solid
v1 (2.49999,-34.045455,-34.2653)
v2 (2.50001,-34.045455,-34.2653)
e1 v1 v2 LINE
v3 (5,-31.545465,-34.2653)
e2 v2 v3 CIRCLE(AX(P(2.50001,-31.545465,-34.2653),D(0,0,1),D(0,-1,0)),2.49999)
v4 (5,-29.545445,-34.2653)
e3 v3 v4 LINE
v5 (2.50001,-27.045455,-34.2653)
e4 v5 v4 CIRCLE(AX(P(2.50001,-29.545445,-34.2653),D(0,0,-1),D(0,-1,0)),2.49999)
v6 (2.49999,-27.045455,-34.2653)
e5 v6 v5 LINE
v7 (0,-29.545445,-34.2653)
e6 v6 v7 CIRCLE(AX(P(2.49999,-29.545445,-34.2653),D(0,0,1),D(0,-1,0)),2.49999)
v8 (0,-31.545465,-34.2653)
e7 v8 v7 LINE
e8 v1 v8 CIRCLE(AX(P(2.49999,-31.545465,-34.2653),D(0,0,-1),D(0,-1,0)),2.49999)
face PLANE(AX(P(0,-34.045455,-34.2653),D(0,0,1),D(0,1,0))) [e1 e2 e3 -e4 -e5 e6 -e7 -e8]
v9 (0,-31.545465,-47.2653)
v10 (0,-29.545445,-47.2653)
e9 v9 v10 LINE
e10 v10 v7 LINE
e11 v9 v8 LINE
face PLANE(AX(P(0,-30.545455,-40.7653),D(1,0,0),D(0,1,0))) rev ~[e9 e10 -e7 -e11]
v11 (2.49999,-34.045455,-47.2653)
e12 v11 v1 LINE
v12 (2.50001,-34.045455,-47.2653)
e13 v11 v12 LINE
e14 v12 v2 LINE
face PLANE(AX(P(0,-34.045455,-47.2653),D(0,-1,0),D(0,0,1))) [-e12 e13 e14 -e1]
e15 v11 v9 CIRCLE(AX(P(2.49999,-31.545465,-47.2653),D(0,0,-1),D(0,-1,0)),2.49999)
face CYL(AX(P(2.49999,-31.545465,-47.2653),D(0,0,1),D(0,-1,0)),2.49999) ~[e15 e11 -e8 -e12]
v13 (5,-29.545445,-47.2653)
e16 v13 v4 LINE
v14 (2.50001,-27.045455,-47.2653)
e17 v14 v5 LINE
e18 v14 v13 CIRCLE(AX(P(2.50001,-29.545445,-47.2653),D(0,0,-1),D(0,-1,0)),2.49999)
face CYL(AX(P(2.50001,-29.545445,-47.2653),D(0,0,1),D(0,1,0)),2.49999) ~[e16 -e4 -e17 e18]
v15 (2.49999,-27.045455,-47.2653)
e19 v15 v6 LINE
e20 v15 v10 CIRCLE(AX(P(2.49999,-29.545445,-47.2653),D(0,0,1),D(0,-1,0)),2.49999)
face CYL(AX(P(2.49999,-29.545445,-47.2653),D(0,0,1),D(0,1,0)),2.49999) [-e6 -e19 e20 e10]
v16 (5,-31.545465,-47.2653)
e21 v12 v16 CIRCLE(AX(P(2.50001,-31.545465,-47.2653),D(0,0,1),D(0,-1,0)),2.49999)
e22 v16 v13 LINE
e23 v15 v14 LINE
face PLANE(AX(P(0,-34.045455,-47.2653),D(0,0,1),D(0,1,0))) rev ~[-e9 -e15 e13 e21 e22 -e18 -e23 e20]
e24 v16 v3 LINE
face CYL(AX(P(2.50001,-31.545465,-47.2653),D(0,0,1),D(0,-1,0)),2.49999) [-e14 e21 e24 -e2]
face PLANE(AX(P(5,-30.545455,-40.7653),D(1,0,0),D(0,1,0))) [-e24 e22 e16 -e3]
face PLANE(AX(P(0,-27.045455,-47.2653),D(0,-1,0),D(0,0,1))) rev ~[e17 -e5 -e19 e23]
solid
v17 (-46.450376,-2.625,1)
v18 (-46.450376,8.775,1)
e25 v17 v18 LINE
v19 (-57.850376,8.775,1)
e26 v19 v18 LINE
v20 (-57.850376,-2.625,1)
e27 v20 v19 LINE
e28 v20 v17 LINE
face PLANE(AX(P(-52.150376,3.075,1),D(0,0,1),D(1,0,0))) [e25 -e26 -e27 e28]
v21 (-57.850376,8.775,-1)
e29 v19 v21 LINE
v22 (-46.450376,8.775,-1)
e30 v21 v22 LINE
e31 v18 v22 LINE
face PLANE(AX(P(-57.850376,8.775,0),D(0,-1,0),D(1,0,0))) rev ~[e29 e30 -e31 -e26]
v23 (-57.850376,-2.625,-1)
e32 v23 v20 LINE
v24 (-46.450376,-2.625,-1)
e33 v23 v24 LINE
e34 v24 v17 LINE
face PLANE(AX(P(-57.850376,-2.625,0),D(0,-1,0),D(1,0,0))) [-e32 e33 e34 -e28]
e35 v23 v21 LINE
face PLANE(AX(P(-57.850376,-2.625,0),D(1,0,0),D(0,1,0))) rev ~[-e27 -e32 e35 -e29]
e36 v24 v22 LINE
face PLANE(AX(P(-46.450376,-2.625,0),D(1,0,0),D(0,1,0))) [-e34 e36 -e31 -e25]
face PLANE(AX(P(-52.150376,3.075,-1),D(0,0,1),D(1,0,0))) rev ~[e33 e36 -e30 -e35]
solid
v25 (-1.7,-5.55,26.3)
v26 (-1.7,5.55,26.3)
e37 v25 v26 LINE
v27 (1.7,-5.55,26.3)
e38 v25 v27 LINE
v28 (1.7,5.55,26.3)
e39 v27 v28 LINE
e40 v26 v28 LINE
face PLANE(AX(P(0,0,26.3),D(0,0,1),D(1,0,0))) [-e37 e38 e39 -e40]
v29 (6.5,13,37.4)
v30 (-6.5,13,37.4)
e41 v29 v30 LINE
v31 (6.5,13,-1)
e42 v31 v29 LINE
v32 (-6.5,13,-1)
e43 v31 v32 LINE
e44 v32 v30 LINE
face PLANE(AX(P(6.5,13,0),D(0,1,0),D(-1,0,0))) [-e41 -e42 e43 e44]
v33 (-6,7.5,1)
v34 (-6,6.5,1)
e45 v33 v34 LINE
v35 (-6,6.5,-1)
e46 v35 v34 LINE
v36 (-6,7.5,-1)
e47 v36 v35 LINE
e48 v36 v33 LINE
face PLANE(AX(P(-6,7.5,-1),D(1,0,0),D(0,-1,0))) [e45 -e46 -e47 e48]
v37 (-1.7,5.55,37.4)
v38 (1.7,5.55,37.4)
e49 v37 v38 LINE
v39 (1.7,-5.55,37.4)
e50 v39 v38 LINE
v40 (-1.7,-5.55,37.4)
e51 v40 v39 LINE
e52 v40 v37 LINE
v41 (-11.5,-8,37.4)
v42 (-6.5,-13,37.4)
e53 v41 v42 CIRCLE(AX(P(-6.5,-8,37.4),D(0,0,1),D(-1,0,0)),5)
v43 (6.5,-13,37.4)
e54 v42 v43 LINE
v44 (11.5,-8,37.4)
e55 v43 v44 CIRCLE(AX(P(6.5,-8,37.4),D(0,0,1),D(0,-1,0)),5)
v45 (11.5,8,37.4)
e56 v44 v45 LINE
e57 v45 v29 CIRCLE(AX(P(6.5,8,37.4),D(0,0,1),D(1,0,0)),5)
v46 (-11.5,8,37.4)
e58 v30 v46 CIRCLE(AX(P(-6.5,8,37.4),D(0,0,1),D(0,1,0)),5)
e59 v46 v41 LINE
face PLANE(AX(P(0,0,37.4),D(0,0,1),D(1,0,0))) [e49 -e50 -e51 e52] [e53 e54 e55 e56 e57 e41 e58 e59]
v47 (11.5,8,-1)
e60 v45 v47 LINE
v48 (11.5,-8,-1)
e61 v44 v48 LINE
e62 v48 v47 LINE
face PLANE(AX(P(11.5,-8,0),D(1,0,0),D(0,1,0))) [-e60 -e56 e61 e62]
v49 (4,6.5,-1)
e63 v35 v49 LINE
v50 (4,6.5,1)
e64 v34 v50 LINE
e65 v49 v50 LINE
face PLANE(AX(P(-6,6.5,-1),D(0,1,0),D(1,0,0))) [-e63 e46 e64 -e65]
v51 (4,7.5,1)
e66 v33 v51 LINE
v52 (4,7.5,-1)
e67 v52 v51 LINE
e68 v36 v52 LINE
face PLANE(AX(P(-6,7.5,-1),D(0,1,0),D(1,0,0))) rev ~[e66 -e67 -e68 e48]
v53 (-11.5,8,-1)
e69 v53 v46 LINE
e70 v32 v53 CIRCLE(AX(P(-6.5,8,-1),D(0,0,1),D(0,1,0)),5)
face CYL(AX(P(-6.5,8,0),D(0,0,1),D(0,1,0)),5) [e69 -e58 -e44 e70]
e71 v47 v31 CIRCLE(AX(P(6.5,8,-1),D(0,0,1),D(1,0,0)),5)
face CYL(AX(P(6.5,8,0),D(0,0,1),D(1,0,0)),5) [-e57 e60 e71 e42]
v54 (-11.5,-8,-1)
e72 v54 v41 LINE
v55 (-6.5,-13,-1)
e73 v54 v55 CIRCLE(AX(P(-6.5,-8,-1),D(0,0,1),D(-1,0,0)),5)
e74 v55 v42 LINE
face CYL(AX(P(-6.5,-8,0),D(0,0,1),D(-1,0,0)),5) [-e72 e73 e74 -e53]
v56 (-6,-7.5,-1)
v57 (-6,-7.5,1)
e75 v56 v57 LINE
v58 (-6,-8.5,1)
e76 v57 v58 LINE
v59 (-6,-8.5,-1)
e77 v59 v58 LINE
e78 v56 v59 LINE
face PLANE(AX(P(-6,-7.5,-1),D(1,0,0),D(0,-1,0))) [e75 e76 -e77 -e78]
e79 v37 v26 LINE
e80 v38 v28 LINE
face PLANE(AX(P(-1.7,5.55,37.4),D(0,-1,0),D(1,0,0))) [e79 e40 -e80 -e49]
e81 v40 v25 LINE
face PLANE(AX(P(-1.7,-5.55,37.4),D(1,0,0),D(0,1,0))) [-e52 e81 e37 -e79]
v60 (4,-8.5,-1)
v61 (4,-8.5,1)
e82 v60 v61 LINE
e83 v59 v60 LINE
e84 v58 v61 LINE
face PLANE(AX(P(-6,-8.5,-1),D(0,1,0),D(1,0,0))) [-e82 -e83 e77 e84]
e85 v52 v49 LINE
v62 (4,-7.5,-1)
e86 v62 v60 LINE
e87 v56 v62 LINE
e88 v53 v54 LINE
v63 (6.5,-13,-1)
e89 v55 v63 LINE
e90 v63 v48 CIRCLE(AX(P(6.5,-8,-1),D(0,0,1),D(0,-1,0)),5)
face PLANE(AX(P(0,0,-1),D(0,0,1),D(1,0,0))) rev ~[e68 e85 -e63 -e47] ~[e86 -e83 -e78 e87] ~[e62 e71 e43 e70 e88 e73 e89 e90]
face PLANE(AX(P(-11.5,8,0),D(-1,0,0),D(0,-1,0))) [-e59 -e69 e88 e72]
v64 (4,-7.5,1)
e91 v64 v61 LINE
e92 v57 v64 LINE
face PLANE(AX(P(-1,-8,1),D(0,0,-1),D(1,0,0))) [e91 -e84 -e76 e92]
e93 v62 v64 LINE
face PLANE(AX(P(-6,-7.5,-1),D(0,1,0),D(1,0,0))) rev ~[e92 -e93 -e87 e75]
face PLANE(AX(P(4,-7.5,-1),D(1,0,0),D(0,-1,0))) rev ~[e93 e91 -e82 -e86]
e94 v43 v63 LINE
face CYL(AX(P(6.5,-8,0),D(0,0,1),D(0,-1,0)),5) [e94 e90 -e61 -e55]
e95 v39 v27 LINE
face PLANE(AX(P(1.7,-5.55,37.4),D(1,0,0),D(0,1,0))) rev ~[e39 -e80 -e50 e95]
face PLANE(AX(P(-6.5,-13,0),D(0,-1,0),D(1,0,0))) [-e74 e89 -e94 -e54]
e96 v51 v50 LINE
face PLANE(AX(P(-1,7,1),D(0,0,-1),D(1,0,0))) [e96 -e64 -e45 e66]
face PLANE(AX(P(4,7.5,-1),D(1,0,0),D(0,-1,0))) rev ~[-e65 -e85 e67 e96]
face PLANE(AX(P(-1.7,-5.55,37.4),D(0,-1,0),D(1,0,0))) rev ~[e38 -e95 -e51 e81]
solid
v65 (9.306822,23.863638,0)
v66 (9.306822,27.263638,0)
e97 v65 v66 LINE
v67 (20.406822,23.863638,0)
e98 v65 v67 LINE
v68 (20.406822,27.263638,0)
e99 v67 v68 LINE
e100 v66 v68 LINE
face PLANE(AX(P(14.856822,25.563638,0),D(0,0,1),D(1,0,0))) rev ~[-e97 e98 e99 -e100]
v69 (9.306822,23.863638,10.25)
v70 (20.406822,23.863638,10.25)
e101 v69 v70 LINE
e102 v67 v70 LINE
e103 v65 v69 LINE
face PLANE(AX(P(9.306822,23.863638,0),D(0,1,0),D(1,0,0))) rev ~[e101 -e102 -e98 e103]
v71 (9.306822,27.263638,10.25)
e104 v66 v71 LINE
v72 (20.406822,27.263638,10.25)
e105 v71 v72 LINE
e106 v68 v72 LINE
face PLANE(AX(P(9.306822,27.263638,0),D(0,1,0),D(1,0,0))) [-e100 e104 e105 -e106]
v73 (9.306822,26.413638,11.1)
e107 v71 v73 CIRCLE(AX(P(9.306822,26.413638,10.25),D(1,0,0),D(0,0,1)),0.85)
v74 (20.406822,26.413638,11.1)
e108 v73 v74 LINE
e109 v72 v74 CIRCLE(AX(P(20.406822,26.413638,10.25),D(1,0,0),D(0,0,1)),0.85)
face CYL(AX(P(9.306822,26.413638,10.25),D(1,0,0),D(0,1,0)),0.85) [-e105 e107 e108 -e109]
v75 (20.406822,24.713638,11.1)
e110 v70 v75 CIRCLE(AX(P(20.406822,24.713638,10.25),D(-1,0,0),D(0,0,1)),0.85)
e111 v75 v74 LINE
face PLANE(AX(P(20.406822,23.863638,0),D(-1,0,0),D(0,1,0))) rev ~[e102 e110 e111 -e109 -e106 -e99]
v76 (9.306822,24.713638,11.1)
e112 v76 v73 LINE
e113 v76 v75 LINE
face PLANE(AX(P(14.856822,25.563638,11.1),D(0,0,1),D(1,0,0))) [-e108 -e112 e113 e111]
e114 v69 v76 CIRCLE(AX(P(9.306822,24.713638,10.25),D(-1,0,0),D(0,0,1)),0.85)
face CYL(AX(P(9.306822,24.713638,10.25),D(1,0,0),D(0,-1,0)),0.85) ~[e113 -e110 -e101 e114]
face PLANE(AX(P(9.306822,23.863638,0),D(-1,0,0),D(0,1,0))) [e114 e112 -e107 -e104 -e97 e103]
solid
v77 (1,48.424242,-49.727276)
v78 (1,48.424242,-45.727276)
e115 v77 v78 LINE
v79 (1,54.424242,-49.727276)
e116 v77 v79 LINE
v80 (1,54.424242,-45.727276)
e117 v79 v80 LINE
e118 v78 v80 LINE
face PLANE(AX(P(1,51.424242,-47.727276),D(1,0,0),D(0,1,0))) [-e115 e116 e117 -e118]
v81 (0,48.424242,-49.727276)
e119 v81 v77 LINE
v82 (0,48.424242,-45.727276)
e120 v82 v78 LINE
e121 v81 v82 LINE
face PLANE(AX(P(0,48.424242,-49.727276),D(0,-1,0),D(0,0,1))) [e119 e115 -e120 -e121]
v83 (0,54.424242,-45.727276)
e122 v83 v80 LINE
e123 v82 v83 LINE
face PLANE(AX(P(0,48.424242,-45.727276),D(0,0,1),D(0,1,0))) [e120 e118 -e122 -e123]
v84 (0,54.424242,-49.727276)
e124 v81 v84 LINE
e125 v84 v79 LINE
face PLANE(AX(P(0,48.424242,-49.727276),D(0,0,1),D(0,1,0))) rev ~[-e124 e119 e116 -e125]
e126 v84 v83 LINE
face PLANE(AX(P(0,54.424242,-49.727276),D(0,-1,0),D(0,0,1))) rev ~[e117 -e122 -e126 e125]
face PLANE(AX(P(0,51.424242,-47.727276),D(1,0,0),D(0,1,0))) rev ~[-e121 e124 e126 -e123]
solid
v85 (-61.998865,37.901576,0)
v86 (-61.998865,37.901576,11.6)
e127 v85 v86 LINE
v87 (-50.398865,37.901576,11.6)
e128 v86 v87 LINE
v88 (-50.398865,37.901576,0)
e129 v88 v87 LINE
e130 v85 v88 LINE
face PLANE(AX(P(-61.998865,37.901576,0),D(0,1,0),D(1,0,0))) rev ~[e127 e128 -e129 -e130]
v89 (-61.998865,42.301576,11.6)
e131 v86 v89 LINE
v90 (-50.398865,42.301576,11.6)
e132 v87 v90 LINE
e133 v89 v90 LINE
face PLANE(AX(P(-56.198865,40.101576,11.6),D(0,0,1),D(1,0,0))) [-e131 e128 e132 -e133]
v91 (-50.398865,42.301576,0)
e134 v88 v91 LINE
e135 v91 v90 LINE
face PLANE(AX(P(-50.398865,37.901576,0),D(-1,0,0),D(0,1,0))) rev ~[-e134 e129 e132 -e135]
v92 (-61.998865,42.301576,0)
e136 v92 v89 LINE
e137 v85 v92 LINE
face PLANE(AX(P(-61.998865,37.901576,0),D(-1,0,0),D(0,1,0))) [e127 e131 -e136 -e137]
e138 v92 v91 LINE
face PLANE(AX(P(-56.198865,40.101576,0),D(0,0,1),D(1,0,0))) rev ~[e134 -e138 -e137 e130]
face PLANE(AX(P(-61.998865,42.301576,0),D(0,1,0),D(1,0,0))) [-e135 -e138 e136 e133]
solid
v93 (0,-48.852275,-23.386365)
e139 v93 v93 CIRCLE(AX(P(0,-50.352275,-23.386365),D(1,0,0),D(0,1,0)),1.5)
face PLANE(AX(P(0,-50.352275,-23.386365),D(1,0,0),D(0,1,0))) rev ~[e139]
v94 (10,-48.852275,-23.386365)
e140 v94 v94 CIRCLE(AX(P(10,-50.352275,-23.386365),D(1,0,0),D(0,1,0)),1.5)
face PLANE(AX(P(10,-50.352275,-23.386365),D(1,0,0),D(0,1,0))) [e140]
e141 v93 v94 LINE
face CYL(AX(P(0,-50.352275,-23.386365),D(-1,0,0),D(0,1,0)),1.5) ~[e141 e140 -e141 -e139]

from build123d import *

# Parameters (mm, degrees)
F1_DEPTH      = 37.4
F2_DEPTH      = 1
F2_DEPTH_BACK = 1
F0_W          = 11.4
F0_H          = 11.4
F4_W          = 11.1
F4_H          = 3.4
F5_DEPTH      = 11.1
F6_W          = 11.6
F6_H          = 4.4
F7_DEPTH      = 11.6
F8_R          = 1.5
F9_DEPTH      = 10
F10_W         = 6
F10_H         = 4
F11_DEPTH     = 1
F12_W         = 7
F12_H         = 13
F13_DEPTH     = 5
F14_R         = 2.49999
F15_W         = 3.4
F15_H         = 11.1
F16_DEPTH     = 11.1
F17_R         = 0.85
F18_W         = 10
F18_H         = 1
F19_DEPTH     = 2


# Not quite as in the source:
# - a fillet or chamfer is up to 0.001 mm smaller than in the source, because OpenCascade refuses the exact size


with BuildPart() as f1:
    # F0 (on Top) → F1 (new body)
    with BuildSketch(Plane.XY):
        with BuildLine():
            ThreePointArc((11.5, 8), (10.0355339059, 11.5355339059), (6.5, 13))
            Line((6.5, 13), (-6.5, 13))
            ThreePointArc((-6.5, 13), (-10.0355339059, 11.5355339059), (-11.5, 8))
            Line((-11.5, 8), (-11.5, -8))
            ThreePointArc((-11.5, -8), (-10.0355339059, -11.5355339059), (-6.5, -13))
            Line((-6.5, -13), (6.5, -13))
            ThreePointArc((6.5, -13), (10.0355339059, -11.5355339059), (11.5, -8))
            Line((11.5, -8), (11.5, 8))
        make_face()
    extrude(amount=F1_DEPTH)

    # F0 (on Top) → F2 (join, two sides)
    with BuildSketch(Plane.XY) as f2_sk:
        with BuildLine():
            ThreePointArc((11.5, 8), (10.0355339059, 11.5355339059), (6.5, 13))
            Line((6.5, 13), (-6.5, 13))
            ThreePointArc((-6.5, 13), (-10.0355339059, 11.5355339059), (-11.5, 8))
            Line((-11.5, 8), (-11.5, -8))
            ThreePointArc((-11.5, -8), (-10.0355339059, -11.5355339059), (-6.5, -13))
            Line((-6.5, -13), (6.5, -13))
            ThreePointArc((6.5, -13), (10.0355339059, -11.5355339059), (11.5, -8))
            Line((11.5, -8), (11.5, 8))
        make_face()
    extrude(amount=F2_DEPTH)
    extrude(f2_sk.sketch, amount=-F2_DEPTH_BACK)

    # F15 (on face) → F16 (cut)
    with BuildSketch(Plane.XY.offset(37.4)):
        Rectangle(F15_W, F15_H)
    extrude(amount=-F16_DEPTH, mode=Mode.SUBTRACT)

    # F18 (on face) → F19 (cut)
    with BuildSketch(Plane(origin=(0, 0, -1), x_dir=(1, 0, 0), z_dir=(0, 0, -1))):
        with Locations((-1, -7)):
            Rectangle(F18_W, F18_H)
        with Locations((-1, 8)):
            Rectangle(F18_W, F18_H)
    extrude(amount=-F19_DEPTH, mode=Mode.SUBTRACT)


with BuildPart() as f2:
    # F0 (on Top) → F2, piece 2 (new body, two sides)
    with BuildSketch(Plane.XY) as f2_2_sk:
        with Locations((-52.1503757715, 3.0749998026)):
            Rectangle(F0_W, F0_H)
    extrude(amount=F2_DEPTH)
    extrude(f2_2_sk.sketch, amount=-F2_DEPTH_BACK)


with BuildPart() as f5:
    # F4 (on Top) → F5 (new body)
    with BuildSketch(Plane.XY):
        with Locations((14.8568219721, 25.5636378199)):
            Rectangle(F4_W, F4_H)
    extrude(amount=F5_DEPTH)

    # F17
    f17_edges = [f5.edges().sort_by_distance(p)[0] for p in [
        (14.856822, 27.263638, 11.1),
        (14.856822, 23.863638, 11.1),
    ]]
    fillet(f17_edges, radius=F17_R)


with BuildPart() as f7:
    # F6 (on Top) → F7 (new body)
    with BuildSketch(Plane.XY):
        with Locations((-56.1988651752, 40.1015764561)):
            Rectangle(F6_W, F6_H)
    extrude(amount=F7_DEPTH)


with BuildPart() as f9:
    # F8 (on Right) → F9 (new body)
    with BuildSketch(Plane.YZ):
        with Locations((-50.3522753716, -23.3863648027)):
            Circle(F8_R)
    extrude(amount=F9_DEPTH)


with BuildPart() as f11:
    # F10 (on Right) → F11 (new body)
    with BuildSketch(Plane.YZ):
        with Locations((51.4242419054, -47.7272756398)):
            Rectangle(F10_W, F10_H)
    extrude(amount=F11_DEPTH)


with BuildPart() as f13:
    # F12 (on Right) → F13 (new body)
    with BuildSketch(Plane.YZ):
        with Locations((-30.5454554036, -40.7653002545)):
            Rectangle(F12_W, F12_H)
    extrude(amount=F13_DEPTH)

    # F14 (radius 2.5 in the source; OpenCascade refuses exactly that, so slightly less here)
    f14_edges = [f13.edges().sort_by_distance(p)[0] for p in [
        (5, -34.045455, -40.7653),
        (5, -27.045455, -40.7653),
        (0, -27.045455, -40.7653),
        (0, -34.045455, -40.7653),
    ]]
    fillet(f14_edges, radius=F14_R)


solid = Compound([f1.part, f2.part, f5.part, f7.part, f9.part, f11.part, f13.part])
